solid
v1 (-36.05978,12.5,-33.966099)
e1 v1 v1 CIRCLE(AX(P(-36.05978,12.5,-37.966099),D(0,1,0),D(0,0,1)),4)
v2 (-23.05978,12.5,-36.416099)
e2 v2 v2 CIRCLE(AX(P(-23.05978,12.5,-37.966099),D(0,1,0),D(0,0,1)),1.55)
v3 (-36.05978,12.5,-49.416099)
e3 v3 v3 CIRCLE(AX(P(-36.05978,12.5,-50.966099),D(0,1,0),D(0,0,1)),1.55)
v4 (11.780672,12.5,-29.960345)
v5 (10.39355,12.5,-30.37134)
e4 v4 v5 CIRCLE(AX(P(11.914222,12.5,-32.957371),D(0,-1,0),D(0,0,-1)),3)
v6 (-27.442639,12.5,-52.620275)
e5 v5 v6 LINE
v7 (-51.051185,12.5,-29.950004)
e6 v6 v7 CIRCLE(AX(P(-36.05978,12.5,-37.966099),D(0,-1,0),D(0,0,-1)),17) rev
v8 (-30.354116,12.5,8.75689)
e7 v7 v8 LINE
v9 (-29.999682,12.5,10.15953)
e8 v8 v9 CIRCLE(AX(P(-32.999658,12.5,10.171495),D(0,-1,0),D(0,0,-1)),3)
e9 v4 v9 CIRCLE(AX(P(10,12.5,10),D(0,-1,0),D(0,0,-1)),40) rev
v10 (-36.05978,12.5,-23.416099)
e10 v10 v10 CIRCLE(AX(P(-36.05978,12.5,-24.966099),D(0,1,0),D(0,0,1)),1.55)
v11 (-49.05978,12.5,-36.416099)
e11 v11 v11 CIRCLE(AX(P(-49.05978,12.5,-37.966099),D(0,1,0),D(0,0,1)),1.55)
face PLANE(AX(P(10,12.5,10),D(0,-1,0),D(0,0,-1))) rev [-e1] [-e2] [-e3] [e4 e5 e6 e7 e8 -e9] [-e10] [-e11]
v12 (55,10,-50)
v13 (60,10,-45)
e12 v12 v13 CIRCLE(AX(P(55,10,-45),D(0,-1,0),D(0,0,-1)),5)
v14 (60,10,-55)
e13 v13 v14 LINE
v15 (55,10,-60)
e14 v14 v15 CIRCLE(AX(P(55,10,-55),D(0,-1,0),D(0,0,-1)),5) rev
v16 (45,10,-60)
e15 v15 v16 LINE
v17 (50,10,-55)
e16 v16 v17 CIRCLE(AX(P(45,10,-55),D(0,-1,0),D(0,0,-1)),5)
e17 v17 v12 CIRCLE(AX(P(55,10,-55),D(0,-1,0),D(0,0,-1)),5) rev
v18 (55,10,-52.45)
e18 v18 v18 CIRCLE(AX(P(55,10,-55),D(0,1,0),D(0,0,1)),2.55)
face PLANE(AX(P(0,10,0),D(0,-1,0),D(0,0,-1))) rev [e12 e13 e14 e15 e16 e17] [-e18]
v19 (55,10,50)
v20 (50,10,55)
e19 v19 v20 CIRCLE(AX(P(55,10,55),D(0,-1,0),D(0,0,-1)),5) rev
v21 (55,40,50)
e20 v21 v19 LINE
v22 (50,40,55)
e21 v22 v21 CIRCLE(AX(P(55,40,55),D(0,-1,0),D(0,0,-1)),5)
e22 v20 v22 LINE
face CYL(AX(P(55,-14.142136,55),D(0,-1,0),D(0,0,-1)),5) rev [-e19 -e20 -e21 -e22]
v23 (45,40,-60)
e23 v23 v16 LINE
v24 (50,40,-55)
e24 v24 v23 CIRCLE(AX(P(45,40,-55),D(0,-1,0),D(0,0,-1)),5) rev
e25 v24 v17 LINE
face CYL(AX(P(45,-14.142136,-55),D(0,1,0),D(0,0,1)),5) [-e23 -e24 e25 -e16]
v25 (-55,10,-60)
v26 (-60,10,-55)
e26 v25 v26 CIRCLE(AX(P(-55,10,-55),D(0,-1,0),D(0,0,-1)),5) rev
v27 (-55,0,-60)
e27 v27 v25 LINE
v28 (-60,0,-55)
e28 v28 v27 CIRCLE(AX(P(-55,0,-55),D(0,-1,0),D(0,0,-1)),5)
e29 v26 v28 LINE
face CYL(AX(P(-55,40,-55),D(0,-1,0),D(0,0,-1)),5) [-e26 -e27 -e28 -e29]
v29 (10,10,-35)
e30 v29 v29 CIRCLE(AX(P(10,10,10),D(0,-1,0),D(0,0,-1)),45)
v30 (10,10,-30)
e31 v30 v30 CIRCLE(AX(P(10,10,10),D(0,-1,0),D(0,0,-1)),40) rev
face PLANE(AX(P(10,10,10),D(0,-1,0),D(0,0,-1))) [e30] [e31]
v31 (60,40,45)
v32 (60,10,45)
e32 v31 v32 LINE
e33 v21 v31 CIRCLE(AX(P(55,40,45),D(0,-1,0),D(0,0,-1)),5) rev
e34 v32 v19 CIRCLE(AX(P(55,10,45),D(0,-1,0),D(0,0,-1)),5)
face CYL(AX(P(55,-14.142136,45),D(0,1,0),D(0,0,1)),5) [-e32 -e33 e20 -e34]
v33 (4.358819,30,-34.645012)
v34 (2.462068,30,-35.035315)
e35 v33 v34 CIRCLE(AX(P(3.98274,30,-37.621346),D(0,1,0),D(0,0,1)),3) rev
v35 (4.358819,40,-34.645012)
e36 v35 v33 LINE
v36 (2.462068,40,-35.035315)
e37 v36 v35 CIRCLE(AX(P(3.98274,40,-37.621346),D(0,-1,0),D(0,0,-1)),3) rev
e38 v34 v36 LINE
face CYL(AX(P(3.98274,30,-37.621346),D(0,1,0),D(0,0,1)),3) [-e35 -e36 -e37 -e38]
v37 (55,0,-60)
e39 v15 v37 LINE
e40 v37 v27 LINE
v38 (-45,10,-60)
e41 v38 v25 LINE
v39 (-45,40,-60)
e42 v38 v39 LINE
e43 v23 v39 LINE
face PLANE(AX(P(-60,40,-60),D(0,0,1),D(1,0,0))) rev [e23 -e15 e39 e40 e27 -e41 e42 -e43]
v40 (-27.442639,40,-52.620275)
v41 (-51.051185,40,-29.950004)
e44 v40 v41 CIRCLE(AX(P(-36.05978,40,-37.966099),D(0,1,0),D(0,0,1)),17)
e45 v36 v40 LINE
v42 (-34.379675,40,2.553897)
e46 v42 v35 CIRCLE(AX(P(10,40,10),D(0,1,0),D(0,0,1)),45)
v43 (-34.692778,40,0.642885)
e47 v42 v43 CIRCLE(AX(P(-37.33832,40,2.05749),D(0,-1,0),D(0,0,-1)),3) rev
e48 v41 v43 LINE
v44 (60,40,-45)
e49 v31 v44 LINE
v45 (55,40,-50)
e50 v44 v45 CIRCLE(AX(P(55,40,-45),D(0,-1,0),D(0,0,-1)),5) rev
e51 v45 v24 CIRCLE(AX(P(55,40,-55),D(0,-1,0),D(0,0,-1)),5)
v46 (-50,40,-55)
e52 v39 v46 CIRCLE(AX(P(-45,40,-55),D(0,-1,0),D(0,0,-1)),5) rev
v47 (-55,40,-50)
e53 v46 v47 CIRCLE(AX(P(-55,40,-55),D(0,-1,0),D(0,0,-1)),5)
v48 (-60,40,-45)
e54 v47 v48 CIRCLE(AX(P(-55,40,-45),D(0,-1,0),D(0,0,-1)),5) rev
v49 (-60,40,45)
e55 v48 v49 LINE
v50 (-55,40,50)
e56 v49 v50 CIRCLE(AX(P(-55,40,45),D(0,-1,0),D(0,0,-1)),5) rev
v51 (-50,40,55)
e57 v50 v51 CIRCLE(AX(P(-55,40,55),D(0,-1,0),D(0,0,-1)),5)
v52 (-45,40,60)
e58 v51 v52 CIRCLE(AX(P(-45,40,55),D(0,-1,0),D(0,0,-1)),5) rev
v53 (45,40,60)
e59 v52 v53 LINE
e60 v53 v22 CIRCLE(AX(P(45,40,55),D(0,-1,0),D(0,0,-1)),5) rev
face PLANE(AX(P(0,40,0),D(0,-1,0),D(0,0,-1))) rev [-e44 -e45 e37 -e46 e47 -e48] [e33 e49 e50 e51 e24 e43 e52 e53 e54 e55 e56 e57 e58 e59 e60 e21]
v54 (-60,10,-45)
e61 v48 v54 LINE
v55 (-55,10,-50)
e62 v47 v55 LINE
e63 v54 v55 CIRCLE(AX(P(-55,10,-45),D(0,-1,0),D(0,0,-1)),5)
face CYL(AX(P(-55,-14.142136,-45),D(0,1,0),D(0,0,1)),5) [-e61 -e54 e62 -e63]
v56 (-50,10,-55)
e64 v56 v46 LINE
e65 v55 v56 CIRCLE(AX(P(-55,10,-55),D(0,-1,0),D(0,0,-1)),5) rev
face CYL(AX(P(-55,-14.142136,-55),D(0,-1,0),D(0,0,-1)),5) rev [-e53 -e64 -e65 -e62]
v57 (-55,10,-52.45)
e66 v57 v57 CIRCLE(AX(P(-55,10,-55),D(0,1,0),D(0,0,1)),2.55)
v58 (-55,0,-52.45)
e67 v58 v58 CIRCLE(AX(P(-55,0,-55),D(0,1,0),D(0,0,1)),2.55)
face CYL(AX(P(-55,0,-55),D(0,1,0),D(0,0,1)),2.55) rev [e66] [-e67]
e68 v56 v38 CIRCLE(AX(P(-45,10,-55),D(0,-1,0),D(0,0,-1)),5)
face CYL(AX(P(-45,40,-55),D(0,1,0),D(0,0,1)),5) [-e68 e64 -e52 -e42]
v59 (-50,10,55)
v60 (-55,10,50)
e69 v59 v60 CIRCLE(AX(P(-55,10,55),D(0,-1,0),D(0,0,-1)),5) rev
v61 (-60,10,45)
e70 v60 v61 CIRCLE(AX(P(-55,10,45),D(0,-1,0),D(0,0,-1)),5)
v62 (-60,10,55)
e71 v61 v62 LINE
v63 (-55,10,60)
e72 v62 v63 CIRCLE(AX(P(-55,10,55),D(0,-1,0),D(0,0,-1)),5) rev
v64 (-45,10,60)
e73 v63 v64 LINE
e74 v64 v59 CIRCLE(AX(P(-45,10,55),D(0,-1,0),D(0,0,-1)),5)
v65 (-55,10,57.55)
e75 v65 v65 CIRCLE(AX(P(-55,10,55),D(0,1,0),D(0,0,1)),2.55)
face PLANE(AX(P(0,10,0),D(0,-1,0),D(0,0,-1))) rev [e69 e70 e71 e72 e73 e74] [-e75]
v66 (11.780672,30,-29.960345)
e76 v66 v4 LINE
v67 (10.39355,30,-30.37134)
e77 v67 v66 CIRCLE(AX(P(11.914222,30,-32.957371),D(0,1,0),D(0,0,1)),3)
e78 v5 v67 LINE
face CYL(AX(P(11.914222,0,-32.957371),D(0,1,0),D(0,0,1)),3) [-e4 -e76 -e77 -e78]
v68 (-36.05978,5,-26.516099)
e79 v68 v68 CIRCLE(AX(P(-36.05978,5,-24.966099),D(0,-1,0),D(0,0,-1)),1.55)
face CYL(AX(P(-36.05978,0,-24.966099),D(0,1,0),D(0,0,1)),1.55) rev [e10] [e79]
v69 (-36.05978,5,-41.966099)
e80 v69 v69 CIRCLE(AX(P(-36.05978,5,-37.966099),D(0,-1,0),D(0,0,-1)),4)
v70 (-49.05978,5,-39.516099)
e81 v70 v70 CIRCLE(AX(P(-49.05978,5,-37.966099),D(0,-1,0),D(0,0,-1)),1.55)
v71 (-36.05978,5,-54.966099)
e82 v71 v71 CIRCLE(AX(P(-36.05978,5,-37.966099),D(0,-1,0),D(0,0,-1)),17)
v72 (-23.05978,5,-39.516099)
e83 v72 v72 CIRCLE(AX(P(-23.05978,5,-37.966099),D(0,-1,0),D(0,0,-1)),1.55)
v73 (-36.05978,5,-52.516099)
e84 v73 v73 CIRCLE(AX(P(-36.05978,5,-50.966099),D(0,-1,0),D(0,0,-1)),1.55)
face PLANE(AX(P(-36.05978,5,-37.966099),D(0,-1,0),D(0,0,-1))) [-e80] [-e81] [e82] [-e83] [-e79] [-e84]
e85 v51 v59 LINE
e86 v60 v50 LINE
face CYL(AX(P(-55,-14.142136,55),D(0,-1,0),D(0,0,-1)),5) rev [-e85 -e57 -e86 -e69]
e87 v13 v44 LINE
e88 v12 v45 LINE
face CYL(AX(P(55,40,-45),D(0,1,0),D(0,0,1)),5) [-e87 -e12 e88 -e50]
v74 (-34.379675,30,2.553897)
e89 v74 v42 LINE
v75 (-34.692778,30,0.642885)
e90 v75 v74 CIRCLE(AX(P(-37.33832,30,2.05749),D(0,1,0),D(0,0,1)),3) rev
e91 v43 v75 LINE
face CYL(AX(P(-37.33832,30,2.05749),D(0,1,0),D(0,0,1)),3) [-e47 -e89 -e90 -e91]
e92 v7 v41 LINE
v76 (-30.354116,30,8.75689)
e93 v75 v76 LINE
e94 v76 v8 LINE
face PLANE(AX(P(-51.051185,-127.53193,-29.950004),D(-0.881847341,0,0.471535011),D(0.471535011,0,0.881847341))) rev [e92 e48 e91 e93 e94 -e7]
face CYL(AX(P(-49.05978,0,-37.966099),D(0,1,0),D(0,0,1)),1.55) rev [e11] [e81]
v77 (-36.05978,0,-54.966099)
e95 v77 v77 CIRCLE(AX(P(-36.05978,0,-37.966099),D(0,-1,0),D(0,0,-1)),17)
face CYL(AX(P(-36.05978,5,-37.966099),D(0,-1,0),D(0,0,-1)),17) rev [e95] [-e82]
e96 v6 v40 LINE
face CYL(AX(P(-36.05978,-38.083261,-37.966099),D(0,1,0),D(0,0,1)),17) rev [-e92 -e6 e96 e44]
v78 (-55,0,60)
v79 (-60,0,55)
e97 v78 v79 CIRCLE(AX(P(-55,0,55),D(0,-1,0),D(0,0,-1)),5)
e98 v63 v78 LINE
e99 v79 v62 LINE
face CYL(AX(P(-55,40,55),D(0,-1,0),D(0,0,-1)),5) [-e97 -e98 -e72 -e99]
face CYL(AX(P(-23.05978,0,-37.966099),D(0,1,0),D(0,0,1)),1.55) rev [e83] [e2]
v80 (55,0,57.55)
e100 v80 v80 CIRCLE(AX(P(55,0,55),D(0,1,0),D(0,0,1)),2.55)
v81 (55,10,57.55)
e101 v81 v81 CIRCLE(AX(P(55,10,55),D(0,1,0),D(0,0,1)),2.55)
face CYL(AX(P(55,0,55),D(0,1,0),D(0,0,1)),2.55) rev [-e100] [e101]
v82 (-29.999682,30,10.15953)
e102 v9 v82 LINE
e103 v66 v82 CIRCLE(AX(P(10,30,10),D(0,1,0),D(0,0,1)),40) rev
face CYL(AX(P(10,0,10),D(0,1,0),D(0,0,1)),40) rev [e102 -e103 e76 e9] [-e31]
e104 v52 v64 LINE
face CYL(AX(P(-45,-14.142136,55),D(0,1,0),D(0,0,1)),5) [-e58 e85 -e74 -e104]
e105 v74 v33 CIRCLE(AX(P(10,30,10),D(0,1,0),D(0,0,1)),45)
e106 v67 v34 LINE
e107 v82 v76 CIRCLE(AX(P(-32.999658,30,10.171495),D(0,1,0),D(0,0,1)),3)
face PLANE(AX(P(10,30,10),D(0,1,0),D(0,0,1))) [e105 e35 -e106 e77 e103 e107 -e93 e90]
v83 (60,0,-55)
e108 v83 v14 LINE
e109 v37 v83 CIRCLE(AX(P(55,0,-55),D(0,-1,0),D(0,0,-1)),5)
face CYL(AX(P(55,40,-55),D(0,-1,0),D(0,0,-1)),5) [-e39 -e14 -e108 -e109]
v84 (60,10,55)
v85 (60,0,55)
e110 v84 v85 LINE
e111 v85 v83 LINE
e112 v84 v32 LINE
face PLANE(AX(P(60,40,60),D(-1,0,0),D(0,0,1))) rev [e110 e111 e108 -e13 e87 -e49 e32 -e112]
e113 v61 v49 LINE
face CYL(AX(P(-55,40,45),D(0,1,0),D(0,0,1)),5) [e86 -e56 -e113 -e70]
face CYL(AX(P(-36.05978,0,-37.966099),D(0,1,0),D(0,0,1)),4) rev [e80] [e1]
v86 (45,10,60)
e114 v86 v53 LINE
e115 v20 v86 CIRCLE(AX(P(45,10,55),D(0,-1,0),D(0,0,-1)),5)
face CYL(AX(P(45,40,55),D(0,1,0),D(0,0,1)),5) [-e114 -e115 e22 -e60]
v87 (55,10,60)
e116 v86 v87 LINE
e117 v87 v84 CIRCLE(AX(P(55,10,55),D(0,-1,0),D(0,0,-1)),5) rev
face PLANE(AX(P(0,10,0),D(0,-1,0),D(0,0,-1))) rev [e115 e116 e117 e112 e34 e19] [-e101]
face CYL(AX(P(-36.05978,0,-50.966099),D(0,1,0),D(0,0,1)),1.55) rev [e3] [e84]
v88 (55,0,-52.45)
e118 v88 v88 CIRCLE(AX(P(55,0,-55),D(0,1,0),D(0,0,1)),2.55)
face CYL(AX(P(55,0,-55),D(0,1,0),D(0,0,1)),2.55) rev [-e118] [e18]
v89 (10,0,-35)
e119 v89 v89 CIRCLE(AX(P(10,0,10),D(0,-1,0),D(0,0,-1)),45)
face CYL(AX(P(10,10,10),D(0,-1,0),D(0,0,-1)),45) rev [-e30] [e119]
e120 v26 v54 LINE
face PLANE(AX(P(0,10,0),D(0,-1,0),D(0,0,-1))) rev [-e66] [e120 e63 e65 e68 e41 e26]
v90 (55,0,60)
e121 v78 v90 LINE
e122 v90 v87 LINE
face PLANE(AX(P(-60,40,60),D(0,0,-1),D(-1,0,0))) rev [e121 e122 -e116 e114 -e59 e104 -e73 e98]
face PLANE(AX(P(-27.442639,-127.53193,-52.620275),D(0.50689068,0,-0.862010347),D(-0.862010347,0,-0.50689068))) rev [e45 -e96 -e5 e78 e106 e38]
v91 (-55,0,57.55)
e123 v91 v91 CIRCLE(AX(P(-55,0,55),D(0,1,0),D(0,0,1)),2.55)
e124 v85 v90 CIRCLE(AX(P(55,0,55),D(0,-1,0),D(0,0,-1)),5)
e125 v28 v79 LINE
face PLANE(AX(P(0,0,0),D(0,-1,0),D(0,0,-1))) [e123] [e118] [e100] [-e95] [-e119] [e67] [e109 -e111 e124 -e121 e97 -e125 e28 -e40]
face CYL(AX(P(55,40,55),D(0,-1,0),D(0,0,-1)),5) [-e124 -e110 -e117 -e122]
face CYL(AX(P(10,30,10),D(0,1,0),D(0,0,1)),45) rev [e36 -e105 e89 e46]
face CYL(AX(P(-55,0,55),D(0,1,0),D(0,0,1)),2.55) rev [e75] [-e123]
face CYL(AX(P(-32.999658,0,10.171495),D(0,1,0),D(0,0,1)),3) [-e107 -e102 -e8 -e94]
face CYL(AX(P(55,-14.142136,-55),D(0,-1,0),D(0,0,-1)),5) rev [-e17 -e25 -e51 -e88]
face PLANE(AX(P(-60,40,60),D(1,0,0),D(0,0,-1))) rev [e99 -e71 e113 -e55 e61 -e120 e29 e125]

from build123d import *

# Parameters (mm, degrees)
SKETCH1_W           = 120
SKETCH1_H           = 120
BOSS_EXTRUDE1_DEPTH = 40
SKETCH2_R           = 40
CUT_EXTRUDE1_DEPTH  = 94.808315196
SKETCH3_R           = 45
CUT_EXTRUDE2_DEPTH  = 10
CUT_EXTRUDE3_START  = -10
SKETCH4_R           = 45
CUT_EXTRUDE3_DEPTH  = 10
SKETCH11_W          = 10
SKETCH11_H          = 10
CUT_EXTRUDE8_DEPTH  = 30
SKETCH7_R           = 17
CUT_EXTRUDE5_DEPTH  = 27.5
CUT_EXTRUDE10_START = -5
SKETCH13_R          = 17
CUT_EXTRUDE10_DEPTH = 5
SKETCH14_R          = 4
SKETCH14_R_2        = 1.55
CUT_EXTRUDE11_DEPTH = 90.197813875
CUT_EXTRUDE7_REACH  = 95.808
SKETCH12_R          = 2.55
CUT_EXTRUDE9_DEPTH  = 91
FILLET1_R           = 5
FILLET2_R           = 5
FILLET3_R           = 3


with BuildPart() as part:
    # Sketch1 → Boss-Extrude1 (new body)
    with BuildSketch(Plane(origin=(0, 0, 0), x_dir=(1, 0, 0), z_dir=(0, 1, 0))):
        Rectangle(SKETCH1_W, SKETCH1_H)
    extrude(amount=BOSS_EXTRUDE1_DEPTH)

    # Sketch2 → Cut-Extrude1 (cut, through all)
    with BuildSketch(Plane(origin=(0, 40, 0), x_dir=(1, 0, 0), z_dir=(0, 1, 0))):
        with Locations(Location((10, -10, 0), (0, 0, 270))):
            Circle(SKETCH2_R)
    extrude(amount=-CUT_EXTRUDE1_DEPTH, mode=Mode.SUBTRACT)

    # Sketch3 → Cut-Extrude2 (cut)
    with BuildSketch(Plane(origin=(0, 40, 0), x_dir=(1, 0, 0), z_dir=(0, 1, 0))):
        with Locations(Location((10, -10, 0), (0, 0, 270))):
            Circle(SKETCH3_R)
    extrude(amount=-CUT_EXTRUDE2_DEPTH, mode=Mode.SUBTRACT)

    # Sketch4 → Cut-Extrude3 (cut)
    with BuildSketch(Plane.XZ.offset(CUT_EXTRUDE3_START)):
        with Locations(Location((10, 10, 0), (0, 0, 90))):
            Circle(SKETCH4_R)
    extrude(amount=CUT_EXTRUDE3_DEPTH, mode=Mode.SUBTRACT)

    # Sketch11 → Cut-Extrude8 (cut)
    with BuildSketch(Plane(origin=(0, 40, 0), x_dir=(1, 0, 0), z_dir=(0, 1, 0))):
        with Locations((-55, 55)):
            Rectangle(SKETCH11_W, SKETCH11_H)
        with Locations((55, 55)):
            Rectangle(SKETCH11_W, SKETCH11_H)
        with Locations((55, -55)):
            Rectangle(SKETCH11_W, SKETCH11_H)
        with Locations((-55, -55)):
            Rectangle(SKETCH11_W, SKETCH11_H)
    extrude(amount=-CUT_EXTRUDE8_DEPTH, mode=Mode.SUBTRACT)

    # Sketch7 → Cut-Extrude5 (cut)
    with BuildSketch(Plane(origin=(0, 40, 0), x_dir=(1, 0, 0), z_dir=(0, 1, 0))):
        with Locations(Location((-36.059780402, 37.96609875, 0), (0, 0, 270))):
            Circle(SKETCH7_R)
    extrude(amount=-CUT_EXTRUDE5_DEPTH, mode=Mode.SUBTRACT)

    # Sketch13 → Cut-Extrude10 (cut)
    with BuildSketch(Plane.XZ.offset(CUT_EXTRUDE10_START)):
        with Locations(Location((-36.059780402, -37.96609875, 0), (0, 0, 90))):
            Circle(SKETCH13_R)
    extrude(amount=CUT_EXTRUDE10_DEPTH, mode=Mode.SUBTRACT)

    # Sketch14 → Cut-Extrude11 (cut, through all)
    with BuildSketch(Plane(origin=(0, 12.5, 0), x_dir=(1, 0, 0), z_dir=(0, 1, 0))):
        with Locations(Location((-36.059780402, 37.96609875, 0), (0, 0, 270))):
            Circle(SKETCH14_R)
        with Locations(Location((-36.059780402, 50.96609875, 0), (0, 0, 270))):
            Circle(SKETCH14_R_2)
        with Locations(Location((-23.059780402, 37.96609875, 0), (0, 0, 270))):
            Circle(SKETCH14_R_2)
        with Locations(Location((-36.059780402, 24.96609875, 0), (0, 0, 270))):
            Circle(SKETCH14_R_2)
        with Locations(Location((-49.059780402, 37.96609875, 0), (0, 0, 270))):
            Circle(SKETCH14_R_2)
    extrude(amount=-CUT_EXTRUDE11_DEPTH, mode=Mode.SUBTRACT)

    # Cut-Extrude7: up to this face of the body (flat: up to its plane)
    cut_extrude7_end = Plane(part.part.faces().sort_by_distance((-36.059780402, 12.5, -54.485266139))[0])
    # Sketch10 → Cut-Extrude7 (cut, up to the picked face)
    with BuildSketch(Plane(origin=(0, 40, 0), x_dir=(1, 0, 0), z_dir=(0, 1, 0)), mode=Mode.PRIVATE) as cut_extrude7_sk1:
        with BuildLine():
            Line((-27.442638837, 52.620274648), (27.741173812, 20.170362142))
            ThreePointArc((27.741173812, 20.170362142), (34.241989685, -35.245315132), (-20.864656949, -26.503725379))
            Line((-20.864656949, -26.503725379), (-51.051185206, 29.950003566))
            ThreePointArc((-51.051185206, 29.950003566), (-47.834461107, 50.228108957), (-27.442638837, 52.620274648))
        make_face()
    cut_extrude7_tool1 = split(extrude(cut_extrude7_sk1.sketch, amount=-CUT_EXTRUDE7_REACH, mode=Mode.PRIVATE), bisect_by=cut_extrude7_end, keep=Keep.BOTH, mode=Mode.PRIVATE)
    add(cut_extrude7_tool1.solids().sort_by(Axis((-2.85152, 40, -3.383418), (0, -1, 0)))[0], mode=Mode.SUBTRACT)

    # Sketch12 → Cut-Extrude9 (cut, through all)
    with BuildSketch(Plane(origin=(0, 10, 0), x_dir=(1, 0, 0), z_dir=(0, 1, 0))):
        with Locations(Location((-55, 55, 0), (0, 0, 270))):
            Circle(SKETCH12_R)
        with Locations(Location((55, 55, 0), (0, 0, 270))):
            Circle(SKETCH12_R)
        with Locations(Location((55, -55, 0), (0, 0, 270))):
            Circle(SKETCH12_R)
        with Locations(Location((-55, -55, 0), (0, 0, 270))):
            Circle(SKETCH12_R)
    extrude(amount=-CUT_EXTRUDE9_DEPTH, mode=Mode.SUBTRACT)

    # Fillet1
    fillet1_edges = [part.edges().sort_by_distance(p)[0] for p in [
        (-60, 5, -60),
        (-50, 25, -50),
        (60, 5, -60),
        (50, 25, -50),
        (60, 5, 60),
        (50, 25, 50),
        (-60, 5, 60),
        (-50, 25, 50),
    ]]
    fillet(fillet1_edges, radius=FILLET1_R)

    # Fillet2
    fillet2_edges = [part.edges().sort_by_distance(p)[0] for p in [
        (50, 25, -60),
        (60, 25, -50),
        (60, 25, 50),
        (-50, 25, 60),
        (-60, 25, 50),
        (-50, 25, -60),
        (-60, 25, -50),
        (50, 25, 60),
    ]]
    fillet(fillet2_edges, radius=FILLET2_R - 0.0001)  # a hair under: the kernel refuses the full size

    # Fillet3
    fillet3_edges = [part.edges().sort_by_distance(p)[0] for p in [
        (-29.99589317, 21.25, 9.426825043),
        (-34.201681099, 35, 1.561315976),
        (11.048415222, 21.25, -29.986257958),
        (3.359839341, 35, -34.507395637),
    ]]
    fillet(fillet3_edges, radius=FILLET3_R)


solid = part.part
